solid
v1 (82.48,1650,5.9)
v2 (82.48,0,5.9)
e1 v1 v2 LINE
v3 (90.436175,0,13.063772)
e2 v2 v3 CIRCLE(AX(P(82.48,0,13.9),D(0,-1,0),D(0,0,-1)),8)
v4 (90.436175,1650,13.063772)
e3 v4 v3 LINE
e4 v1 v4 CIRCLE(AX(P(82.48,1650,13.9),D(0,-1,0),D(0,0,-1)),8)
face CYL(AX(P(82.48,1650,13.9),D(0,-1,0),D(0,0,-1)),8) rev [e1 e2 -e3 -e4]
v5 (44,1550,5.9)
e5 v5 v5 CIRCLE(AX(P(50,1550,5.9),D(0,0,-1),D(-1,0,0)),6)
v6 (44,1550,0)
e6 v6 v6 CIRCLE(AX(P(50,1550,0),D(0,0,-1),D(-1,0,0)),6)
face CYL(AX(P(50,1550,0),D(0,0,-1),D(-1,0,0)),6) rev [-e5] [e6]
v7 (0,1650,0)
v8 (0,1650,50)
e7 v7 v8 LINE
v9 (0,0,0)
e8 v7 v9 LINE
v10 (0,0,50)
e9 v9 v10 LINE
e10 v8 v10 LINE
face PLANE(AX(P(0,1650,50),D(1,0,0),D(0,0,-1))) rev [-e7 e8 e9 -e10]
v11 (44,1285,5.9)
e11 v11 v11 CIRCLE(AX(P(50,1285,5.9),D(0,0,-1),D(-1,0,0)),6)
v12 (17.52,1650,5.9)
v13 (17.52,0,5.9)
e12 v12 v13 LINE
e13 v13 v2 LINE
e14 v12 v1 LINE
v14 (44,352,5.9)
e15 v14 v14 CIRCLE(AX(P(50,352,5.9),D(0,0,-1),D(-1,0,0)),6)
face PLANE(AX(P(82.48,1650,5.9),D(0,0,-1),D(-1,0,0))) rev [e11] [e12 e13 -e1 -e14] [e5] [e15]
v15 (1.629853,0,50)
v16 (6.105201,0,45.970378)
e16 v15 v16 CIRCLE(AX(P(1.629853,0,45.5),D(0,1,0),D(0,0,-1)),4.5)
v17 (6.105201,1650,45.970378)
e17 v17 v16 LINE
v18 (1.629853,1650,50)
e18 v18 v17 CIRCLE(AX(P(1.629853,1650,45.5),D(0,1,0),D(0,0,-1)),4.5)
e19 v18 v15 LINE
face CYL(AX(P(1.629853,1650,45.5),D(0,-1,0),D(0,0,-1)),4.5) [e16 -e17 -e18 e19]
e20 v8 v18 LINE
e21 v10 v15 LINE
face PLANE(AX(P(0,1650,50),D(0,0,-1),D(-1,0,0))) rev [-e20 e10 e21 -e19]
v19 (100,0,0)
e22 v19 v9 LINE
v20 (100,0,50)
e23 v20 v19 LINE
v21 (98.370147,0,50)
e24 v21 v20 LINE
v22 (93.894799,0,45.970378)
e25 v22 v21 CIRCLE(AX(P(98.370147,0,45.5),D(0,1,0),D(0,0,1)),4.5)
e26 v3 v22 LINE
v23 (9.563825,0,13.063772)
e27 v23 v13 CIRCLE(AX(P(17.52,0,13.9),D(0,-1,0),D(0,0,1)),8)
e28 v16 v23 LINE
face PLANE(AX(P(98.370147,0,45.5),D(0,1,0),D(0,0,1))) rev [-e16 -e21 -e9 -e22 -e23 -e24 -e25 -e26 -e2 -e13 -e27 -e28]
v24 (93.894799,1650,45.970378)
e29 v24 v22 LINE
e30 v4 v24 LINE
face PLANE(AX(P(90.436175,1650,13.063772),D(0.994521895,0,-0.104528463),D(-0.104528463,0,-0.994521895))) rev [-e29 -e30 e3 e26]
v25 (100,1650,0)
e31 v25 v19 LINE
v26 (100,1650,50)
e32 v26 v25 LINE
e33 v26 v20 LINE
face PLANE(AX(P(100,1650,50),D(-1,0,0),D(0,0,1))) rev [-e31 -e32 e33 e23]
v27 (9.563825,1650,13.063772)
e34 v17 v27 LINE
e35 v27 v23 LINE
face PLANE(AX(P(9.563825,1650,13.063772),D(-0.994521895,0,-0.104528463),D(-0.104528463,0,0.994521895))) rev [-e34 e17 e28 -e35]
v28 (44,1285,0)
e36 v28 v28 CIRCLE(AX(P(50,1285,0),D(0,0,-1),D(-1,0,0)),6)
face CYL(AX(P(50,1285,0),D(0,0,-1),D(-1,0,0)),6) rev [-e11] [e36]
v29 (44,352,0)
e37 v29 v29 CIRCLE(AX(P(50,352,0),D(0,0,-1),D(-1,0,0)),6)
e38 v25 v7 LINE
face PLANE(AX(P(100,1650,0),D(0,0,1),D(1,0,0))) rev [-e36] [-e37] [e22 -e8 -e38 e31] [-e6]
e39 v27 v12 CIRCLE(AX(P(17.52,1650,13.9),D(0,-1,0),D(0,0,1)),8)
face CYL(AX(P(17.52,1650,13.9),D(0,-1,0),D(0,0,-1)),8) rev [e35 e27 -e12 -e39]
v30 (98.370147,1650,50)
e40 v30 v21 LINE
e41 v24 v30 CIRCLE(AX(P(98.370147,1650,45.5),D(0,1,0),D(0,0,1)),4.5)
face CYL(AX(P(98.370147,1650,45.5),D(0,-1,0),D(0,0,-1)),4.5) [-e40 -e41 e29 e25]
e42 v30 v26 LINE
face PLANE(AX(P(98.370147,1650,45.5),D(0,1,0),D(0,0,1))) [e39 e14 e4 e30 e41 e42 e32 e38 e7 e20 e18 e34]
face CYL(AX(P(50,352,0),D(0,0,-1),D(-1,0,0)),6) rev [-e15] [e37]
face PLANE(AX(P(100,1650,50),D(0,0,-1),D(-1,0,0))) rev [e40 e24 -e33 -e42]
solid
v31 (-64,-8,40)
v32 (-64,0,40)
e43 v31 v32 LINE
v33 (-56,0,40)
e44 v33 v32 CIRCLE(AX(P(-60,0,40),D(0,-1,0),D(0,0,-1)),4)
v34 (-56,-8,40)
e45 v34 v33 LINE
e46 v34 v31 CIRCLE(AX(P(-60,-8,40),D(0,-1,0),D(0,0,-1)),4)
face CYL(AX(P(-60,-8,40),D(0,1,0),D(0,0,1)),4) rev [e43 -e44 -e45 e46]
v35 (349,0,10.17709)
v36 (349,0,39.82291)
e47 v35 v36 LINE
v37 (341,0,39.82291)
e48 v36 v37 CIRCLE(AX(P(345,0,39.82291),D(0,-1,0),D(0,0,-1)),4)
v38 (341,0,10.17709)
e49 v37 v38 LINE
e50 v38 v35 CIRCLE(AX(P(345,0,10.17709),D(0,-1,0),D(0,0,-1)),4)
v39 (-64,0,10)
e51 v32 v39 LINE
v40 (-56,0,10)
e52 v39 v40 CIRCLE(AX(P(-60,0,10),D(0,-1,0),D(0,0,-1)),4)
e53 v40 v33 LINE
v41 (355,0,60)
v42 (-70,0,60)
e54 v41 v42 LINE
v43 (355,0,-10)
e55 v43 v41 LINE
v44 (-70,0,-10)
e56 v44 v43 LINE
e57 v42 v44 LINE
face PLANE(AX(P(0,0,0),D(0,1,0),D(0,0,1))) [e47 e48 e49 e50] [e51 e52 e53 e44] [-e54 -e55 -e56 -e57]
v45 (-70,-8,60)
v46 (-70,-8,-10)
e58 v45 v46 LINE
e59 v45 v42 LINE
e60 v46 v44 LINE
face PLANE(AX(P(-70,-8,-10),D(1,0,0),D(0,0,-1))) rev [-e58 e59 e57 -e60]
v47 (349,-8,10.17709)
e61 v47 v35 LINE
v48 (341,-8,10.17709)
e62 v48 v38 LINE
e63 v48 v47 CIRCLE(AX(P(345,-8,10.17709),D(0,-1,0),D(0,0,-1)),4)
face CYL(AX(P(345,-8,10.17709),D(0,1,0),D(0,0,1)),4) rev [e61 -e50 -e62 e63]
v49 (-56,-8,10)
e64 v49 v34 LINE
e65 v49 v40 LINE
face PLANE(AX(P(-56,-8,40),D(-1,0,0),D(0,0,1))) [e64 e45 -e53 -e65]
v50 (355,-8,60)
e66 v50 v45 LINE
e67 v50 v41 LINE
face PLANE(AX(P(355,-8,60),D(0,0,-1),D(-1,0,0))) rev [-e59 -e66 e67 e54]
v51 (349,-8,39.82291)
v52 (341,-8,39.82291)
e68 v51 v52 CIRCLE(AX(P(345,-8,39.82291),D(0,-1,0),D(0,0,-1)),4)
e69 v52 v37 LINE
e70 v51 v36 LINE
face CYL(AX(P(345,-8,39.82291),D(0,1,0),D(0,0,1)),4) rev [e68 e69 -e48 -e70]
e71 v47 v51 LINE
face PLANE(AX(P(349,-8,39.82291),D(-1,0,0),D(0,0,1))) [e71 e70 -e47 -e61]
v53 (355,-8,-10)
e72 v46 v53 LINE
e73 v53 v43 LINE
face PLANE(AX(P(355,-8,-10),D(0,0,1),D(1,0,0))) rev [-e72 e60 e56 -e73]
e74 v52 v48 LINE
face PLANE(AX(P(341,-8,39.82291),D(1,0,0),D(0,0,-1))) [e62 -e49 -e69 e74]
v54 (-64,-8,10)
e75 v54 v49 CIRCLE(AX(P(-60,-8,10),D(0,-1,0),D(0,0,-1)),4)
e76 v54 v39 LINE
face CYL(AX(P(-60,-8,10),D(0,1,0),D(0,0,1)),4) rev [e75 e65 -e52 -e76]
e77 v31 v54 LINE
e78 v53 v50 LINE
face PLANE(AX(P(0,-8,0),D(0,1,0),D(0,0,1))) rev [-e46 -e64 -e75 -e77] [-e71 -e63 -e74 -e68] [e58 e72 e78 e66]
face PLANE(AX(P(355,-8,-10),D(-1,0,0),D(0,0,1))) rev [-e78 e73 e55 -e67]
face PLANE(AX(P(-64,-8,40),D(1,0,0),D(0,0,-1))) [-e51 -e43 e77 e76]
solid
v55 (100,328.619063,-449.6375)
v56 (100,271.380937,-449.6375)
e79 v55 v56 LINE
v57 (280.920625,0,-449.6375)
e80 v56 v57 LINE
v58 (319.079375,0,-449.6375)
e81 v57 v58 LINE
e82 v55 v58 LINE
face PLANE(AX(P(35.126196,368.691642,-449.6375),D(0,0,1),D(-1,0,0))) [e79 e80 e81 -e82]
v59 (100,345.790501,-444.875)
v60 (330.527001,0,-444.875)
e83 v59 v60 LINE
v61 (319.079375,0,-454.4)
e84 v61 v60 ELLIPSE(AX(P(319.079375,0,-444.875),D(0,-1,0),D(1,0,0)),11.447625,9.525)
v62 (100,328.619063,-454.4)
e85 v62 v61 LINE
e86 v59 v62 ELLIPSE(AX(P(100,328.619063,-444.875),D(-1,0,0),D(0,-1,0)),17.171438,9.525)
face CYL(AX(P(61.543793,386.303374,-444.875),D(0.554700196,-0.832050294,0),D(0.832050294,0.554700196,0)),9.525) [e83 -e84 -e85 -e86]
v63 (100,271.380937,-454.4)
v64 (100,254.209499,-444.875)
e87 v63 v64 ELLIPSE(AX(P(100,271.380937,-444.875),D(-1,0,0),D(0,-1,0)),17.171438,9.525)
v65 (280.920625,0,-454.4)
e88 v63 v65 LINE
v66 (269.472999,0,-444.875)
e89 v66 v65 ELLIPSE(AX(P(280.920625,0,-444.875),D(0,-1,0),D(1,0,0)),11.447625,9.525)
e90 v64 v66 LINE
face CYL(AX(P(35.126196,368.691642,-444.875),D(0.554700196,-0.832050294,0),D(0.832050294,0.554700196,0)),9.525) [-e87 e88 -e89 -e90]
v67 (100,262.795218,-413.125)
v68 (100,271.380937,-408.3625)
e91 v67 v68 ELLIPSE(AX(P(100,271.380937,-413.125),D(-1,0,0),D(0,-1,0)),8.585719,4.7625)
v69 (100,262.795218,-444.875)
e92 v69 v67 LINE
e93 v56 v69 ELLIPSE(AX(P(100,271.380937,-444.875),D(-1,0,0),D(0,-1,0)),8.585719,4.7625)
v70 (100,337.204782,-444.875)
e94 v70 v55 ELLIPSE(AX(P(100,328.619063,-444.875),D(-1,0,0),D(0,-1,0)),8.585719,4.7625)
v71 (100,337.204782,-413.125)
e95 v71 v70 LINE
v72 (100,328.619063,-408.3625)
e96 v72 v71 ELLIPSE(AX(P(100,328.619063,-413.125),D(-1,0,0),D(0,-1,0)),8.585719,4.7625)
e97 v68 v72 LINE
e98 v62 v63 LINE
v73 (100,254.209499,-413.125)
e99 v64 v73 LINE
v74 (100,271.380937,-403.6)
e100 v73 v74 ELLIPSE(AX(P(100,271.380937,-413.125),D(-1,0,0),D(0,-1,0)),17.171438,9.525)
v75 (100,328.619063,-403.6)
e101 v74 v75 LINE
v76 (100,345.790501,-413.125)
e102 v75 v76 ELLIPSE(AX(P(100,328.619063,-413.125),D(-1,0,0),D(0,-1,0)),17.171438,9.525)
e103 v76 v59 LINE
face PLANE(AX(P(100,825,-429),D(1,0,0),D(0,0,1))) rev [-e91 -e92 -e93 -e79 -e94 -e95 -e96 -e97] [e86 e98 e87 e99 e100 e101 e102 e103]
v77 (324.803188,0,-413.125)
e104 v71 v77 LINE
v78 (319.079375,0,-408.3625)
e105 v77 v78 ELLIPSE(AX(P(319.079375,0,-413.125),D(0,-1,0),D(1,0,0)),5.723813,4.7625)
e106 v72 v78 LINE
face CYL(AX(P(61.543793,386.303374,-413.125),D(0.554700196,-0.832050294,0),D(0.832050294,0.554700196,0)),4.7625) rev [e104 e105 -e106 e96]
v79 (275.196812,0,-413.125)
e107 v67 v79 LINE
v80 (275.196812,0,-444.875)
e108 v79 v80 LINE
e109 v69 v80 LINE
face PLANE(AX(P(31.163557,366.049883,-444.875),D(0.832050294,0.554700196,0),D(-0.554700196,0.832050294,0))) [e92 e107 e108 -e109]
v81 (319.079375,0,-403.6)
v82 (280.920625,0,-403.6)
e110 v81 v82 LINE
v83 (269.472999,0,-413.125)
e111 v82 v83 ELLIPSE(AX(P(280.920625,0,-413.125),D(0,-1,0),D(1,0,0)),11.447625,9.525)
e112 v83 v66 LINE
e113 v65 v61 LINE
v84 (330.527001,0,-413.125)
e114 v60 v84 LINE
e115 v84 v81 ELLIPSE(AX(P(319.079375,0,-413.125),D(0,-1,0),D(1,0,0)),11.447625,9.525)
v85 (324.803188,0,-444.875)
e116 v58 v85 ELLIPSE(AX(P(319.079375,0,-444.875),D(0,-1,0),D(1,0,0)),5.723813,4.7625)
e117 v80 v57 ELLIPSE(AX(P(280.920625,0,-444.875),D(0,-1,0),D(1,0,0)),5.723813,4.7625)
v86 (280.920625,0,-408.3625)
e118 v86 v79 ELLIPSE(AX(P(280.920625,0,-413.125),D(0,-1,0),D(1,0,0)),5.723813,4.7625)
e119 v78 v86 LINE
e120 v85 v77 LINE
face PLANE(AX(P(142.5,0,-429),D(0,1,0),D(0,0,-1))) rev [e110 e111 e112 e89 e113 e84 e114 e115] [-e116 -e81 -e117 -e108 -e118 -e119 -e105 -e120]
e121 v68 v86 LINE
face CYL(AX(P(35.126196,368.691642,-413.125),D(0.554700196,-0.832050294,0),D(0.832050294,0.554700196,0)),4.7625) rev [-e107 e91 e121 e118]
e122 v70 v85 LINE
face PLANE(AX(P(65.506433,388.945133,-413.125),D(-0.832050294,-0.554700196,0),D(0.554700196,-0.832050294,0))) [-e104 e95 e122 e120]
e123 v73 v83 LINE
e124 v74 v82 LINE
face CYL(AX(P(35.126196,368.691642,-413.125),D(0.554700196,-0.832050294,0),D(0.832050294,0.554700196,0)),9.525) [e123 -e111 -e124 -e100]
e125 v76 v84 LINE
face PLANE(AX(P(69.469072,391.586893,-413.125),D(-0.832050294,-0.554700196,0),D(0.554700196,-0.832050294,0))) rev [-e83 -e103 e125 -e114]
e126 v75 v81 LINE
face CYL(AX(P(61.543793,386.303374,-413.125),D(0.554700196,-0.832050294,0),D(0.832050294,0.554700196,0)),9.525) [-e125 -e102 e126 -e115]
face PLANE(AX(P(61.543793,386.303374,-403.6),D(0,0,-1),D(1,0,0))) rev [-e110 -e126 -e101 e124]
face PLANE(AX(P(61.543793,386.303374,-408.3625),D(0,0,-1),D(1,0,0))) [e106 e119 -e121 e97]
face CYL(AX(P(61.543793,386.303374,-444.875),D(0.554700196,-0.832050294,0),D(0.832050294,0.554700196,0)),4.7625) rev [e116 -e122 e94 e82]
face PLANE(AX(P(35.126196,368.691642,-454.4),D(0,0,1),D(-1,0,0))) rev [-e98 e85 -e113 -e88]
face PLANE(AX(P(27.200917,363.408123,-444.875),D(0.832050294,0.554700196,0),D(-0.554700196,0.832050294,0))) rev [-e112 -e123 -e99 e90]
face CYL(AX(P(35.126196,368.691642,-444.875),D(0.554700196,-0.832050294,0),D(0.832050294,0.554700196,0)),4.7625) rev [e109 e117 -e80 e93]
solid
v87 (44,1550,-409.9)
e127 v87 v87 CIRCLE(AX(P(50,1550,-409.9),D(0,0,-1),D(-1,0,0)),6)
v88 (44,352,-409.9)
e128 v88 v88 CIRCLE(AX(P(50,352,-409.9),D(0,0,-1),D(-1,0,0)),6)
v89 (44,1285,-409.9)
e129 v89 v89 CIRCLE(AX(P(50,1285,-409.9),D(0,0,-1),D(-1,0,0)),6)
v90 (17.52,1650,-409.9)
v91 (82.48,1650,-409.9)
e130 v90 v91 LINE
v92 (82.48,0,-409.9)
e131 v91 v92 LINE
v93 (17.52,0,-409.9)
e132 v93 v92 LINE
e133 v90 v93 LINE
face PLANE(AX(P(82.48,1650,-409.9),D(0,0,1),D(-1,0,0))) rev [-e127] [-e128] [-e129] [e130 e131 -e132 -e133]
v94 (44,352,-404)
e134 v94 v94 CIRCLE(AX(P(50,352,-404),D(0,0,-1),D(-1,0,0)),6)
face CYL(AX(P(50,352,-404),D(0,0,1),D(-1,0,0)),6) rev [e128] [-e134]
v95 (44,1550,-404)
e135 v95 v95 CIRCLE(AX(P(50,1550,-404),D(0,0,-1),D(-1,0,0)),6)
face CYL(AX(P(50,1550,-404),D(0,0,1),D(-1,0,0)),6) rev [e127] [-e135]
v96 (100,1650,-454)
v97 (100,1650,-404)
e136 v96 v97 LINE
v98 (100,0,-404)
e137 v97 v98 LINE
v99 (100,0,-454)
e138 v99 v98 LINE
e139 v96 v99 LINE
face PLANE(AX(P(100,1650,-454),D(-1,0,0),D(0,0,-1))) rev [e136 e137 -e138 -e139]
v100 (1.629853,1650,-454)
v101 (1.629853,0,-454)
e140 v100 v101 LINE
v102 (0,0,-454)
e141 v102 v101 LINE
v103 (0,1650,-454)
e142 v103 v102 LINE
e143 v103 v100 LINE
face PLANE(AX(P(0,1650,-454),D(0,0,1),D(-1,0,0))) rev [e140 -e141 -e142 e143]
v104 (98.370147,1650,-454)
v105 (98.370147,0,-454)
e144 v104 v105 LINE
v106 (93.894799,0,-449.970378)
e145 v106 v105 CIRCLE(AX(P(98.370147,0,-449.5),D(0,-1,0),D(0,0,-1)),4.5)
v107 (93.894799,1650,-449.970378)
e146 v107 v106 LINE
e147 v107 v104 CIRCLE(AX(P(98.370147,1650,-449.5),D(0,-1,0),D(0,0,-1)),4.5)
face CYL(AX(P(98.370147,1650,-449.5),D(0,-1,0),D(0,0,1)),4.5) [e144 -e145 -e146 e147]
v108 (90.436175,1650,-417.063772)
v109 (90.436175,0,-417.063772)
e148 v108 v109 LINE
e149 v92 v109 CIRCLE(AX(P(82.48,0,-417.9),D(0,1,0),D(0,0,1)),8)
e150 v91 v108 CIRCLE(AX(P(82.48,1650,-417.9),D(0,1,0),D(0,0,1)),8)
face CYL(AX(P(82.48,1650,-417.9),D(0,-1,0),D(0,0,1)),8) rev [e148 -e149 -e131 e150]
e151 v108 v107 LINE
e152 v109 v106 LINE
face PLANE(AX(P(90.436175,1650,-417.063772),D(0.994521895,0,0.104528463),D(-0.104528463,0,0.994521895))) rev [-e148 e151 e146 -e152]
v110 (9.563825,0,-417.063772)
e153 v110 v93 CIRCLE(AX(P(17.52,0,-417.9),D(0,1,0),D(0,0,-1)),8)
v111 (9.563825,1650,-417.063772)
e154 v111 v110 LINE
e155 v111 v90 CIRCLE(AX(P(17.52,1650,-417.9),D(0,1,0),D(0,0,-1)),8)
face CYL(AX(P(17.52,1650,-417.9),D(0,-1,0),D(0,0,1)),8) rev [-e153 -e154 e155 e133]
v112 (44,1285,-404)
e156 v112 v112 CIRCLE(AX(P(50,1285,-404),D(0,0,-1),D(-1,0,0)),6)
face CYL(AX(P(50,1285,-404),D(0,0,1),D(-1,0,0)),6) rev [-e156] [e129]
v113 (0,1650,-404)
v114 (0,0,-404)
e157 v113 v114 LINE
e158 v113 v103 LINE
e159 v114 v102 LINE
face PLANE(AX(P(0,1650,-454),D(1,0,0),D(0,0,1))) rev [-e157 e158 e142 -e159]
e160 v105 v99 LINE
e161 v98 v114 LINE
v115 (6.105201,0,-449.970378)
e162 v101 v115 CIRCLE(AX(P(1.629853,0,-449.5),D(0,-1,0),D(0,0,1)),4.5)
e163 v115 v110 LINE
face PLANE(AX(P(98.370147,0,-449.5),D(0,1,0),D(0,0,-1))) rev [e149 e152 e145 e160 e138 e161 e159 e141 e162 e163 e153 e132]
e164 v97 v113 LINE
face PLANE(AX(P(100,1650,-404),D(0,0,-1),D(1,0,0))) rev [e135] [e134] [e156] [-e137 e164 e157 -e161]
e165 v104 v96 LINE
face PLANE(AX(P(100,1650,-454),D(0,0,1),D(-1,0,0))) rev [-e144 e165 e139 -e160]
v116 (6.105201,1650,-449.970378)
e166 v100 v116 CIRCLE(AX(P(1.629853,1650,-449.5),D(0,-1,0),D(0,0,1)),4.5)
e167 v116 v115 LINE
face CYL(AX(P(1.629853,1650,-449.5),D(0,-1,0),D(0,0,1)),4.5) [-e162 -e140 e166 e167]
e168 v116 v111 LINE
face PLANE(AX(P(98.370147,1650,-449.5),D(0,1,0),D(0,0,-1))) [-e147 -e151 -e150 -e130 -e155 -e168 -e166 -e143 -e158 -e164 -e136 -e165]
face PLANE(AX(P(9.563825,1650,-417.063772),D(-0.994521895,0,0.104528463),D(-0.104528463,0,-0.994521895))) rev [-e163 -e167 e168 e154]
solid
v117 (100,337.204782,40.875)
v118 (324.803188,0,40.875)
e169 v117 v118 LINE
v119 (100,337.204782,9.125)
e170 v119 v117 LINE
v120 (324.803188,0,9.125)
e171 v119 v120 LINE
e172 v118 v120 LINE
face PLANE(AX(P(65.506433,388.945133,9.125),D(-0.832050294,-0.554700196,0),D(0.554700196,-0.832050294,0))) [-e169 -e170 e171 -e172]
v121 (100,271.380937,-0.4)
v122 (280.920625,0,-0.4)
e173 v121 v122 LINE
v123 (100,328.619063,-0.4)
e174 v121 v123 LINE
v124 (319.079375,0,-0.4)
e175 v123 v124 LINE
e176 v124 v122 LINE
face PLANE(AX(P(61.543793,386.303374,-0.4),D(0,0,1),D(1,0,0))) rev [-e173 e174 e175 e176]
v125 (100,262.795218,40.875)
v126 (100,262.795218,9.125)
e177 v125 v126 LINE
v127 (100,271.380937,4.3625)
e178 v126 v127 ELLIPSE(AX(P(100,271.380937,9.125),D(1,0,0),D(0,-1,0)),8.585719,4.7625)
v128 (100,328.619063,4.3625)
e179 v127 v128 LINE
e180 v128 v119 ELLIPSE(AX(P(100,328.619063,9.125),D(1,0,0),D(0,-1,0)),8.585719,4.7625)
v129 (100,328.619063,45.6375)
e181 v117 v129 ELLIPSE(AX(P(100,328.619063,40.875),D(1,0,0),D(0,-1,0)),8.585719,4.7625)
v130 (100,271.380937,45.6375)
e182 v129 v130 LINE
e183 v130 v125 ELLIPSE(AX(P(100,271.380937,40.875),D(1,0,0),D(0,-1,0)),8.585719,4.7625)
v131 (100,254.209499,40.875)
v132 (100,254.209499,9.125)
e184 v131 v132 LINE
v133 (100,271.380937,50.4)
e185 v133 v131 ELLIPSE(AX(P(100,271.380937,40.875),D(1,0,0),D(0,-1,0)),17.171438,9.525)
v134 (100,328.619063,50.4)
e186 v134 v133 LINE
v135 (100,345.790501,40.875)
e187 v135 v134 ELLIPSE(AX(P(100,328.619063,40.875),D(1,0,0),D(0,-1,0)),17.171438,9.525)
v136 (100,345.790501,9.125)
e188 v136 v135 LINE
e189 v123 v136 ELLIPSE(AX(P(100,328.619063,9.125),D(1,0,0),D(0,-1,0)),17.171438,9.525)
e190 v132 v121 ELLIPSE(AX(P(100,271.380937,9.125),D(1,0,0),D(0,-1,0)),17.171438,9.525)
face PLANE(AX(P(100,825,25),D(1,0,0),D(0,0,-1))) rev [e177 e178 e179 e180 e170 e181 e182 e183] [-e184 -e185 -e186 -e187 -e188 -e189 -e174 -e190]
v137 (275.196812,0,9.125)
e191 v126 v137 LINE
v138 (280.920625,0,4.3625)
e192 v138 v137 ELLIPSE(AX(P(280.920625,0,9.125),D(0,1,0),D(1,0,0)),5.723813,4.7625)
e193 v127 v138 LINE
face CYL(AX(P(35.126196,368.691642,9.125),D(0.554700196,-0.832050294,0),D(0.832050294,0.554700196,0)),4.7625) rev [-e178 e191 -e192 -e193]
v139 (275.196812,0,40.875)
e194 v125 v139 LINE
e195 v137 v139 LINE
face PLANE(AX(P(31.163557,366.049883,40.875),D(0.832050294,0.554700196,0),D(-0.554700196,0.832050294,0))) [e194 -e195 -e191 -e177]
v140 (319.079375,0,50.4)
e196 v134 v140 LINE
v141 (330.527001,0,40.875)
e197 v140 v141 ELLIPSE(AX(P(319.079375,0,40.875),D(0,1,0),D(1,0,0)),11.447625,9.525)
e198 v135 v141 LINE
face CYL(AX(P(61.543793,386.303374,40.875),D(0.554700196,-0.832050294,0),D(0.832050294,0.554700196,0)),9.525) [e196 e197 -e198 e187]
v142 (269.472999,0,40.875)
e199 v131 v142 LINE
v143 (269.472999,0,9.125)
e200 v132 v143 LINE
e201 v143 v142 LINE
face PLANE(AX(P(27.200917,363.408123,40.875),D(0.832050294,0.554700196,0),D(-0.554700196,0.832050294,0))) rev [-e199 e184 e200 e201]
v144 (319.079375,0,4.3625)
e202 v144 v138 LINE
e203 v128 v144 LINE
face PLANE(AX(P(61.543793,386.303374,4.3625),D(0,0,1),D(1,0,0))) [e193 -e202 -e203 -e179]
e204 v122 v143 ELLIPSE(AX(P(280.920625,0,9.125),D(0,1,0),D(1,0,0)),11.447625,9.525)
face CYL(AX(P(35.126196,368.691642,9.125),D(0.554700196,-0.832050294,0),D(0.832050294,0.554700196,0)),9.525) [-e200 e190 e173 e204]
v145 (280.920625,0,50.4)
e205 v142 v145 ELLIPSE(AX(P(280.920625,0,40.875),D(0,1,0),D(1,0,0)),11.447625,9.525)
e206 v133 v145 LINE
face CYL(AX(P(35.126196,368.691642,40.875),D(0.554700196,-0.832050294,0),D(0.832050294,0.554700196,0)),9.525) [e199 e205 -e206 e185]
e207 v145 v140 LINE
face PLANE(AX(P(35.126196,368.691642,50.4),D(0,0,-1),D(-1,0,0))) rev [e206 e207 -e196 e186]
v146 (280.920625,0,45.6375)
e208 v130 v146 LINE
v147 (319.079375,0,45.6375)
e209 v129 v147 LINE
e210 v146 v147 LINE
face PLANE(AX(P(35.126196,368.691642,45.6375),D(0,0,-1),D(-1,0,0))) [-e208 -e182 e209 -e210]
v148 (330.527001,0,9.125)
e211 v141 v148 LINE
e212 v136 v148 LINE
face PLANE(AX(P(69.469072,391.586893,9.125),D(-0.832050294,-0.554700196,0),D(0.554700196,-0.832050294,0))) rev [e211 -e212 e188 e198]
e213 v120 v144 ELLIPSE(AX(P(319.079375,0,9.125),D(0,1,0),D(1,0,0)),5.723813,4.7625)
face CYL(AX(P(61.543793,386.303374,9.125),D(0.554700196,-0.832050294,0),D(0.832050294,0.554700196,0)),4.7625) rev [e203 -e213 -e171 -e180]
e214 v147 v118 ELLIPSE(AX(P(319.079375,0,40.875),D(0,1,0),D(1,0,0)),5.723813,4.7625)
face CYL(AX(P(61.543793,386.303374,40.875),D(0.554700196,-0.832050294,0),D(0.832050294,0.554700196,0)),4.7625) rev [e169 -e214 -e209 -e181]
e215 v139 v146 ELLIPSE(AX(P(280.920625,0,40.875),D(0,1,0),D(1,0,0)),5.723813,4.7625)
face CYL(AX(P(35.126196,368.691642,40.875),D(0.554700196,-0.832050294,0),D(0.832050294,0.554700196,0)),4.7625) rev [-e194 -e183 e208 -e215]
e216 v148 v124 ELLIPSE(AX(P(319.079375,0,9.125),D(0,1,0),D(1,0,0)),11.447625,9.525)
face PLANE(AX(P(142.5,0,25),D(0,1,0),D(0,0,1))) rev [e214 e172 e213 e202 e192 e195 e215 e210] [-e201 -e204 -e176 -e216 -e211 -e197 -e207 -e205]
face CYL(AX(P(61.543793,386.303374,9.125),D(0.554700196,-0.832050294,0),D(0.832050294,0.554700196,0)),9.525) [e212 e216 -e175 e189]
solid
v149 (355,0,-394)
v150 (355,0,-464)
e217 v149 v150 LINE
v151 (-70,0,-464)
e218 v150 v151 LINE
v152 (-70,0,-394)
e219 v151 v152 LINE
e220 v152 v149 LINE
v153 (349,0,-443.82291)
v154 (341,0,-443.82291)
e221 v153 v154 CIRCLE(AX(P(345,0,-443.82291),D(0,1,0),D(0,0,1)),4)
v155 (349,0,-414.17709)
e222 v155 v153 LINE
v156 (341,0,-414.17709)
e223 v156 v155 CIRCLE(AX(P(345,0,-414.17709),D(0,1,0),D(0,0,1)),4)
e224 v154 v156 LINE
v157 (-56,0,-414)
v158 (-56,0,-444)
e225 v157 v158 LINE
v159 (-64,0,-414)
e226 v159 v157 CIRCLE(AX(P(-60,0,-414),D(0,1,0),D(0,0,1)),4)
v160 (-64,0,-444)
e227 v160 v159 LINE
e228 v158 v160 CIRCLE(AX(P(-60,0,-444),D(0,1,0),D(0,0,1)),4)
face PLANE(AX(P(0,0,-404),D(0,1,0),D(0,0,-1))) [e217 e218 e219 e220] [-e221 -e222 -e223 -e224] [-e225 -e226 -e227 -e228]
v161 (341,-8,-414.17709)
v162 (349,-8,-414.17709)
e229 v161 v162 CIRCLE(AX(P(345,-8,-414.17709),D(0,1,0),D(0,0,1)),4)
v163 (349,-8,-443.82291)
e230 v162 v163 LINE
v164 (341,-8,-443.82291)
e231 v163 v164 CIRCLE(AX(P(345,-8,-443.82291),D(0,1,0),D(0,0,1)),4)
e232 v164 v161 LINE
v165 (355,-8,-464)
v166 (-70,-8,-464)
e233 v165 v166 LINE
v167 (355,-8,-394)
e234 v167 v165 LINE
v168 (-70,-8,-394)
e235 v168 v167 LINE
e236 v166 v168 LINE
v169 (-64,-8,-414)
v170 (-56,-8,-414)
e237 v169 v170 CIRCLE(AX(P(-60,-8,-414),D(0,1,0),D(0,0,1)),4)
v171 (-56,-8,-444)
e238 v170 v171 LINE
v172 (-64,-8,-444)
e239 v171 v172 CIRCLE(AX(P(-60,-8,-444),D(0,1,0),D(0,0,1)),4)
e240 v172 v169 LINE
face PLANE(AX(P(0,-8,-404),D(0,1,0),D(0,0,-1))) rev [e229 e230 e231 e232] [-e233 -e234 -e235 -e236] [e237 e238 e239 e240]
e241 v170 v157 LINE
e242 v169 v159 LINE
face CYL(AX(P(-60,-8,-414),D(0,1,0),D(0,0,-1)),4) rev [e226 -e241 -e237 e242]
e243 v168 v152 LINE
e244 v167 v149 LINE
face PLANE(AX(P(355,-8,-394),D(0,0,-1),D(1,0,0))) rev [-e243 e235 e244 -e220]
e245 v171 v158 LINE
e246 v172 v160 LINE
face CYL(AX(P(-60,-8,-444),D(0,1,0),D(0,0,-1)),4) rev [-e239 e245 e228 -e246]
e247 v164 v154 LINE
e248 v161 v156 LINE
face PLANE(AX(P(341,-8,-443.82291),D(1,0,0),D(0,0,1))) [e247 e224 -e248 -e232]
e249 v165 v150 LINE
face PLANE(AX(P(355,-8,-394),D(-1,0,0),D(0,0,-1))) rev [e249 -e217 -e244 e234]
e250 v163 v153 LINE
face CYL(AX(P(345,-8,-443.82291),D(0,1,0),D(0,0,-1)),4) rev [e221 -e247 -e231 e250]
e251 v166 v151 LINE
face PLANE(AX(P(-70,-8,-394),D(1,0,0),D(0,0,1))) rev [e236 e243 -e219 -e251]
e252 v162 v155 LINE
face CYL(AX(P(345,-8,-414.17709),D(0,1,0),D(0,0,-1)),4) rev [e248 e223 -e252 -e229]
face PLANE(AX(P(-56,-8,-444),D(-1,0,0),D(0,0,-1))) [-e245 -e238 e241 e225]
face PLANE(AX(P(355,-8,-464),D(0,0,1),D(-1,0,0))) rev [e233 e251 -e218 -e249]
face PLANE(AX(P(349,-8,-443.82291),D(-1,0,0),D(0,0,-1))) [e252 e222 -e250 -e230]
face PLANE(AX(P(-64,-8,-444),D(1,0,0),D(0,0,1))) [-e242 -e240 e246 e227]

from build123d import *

# Parameters (mm, degrees)
CEOWNIK_C_100_X_10_1_DEPTH                     = 1650
SZKIC21_W                                      = 425
SZKIC21_H                                      = 70
DODANIE_WYCI_GNI_CIE1_DEPTH                    = 8
RURA_CIENKO_CIENNA_KWADRATOWA_TS2X2X0_18_DEPTH = 524.856349859
SZKIC59_W                                      = 6
SZKIC59_H                                      = 60
OTWORY_USTALAJ_CE_12_0MM1_AT_2_COUNT           = 2
OTWORY_USTALAJ_CE_12_0MM1_AT_2_PITCH           = 265
OTWORY_USTALAJ_CE_12_0MM1_AT_3_COUNT           = 2
OTWORY_USTALAJ_CE_12_0MM1_AT_3_PITCH           = 1198


# Read off the part's stored shape, not the designer's step: Przytnij/Wydłuż2, Przytnij/Wydłuż3
with BuildPart() as part:
    # Sketch118 → Ceownik c 100 X 10(1) (new body)
    with BuildSketch(Plane.ZX):
        with BuildLine():
            Line((50, 100), (0, 100))
            Line((0, 100), (0, 0))
            Line((0, 0), (50, 0))
            Line((50, 0), (50, 1.629852671))
            ThreePointArc((50, 1.629852671), (48.844151715, 4.6409404), (45.970378085, 6.1052012))
            Line((45.970378085, 6.1052012), (13.063772294, 9.563824837))
            ThreePointArc((13.063772294, 9.563824837), (7.954841396, 12.166955149), (5.9, 17.52))
            Line((5.9, 17.52), (5.9, 82.48))
            ThreePointArc((5.9, 82.48), (7.954841396, 87.833044851), (13.063772294, 90.436175163))
            Line((13.063772294, 90.436175163), (45.970378085, 93.8947988))
            ThreePointArc((45.970378085, 93.8947988), (48.844151715, 95.3590596), (50, 98.370147329))
            Line((50, 98.370147329), (50, 100))
        make_face()
    extrude(amount=CEOWNIK_C_100_X_10_1_DEPTH)

    # Szkic59 → Otwory ustalające Ø12.0mm1 (revolve, cut)
    with BuildSketch(Plane(origin=(50, 1550, 0), x_dir=(0, 1, 0), z_dir=(1, 0, 0))):
        with Locations((3, 30)):
            Rectangle(SZKIC59_W, SZKIC59_H)
    otwory_ustalaj_ce_12_0mm1 = revolve(axis=Axis((50, 1550, -6.35), (0, 0, 1)), mode=Mode.SUBTRACT)

    # Otwory ustalające Ø12.0mm1 at 2: Otwory ustalające Ø12.0mm1 ×2
    with Locations(*[(0, -i * OTWORY_USTALAJ_CE_12_0MM1_AT_2_PITCH, 0) for i in range(1, OTWORY_USTALAJ_CE_12_0MM1_AT_2_COUNT)]):
        add(otwory_ustalaj_ce_12_0mm1, mode=Mode.SUBTRACT)

    # Otwory ustalające Ø12.0mm1 at 3: Otwory ustalające Ø12.0mm1 ×2
    with Locations(*[(0, -i * OTWORY_USTALAJ_CE_12_0MM1_AT_3_PITCH, 0) for i in range(1, OTWORY_USTALAJ_CE_12_0MM1_AT_3_COUNT)]):
        add(otwory_ustalaj_ce_12_0mm1, mode=Mode.SUBTRACT)


with BuildPart() as body_2:
    # Szkic21 → Dodanie-wyciągnięcie1 (new body)
    with BuildSketch(Plane.XZ):
        with Locations((142.5, 25)):
            Rectangle(SZKIC21_W, SZKIC21_H)
        with BuildLine():
            Line((-56, 40), (-56, 10))
            ThreePointArc((-56, 10), (-60, 6), (-64, 10))
            Line((-64, 10), (-64, 40))
            ThreePointArc((-64, 40), (-60, 44), (-56, 40))
        make_face(mode=Mode.SUBTRACT)
        with BuildLine():
            Line((349, 39.822910334), (349, 10.177089666))
            ThreePointArc((349, 10.177089666), (345, 6.177089666), (341, 10.177089666))
            Line((341, 10.177089666), (341, 39.822910334))
            ThreePointArc((341, 39.822910334), (345, 43.822910334), (349, 39.822910334))
        make_face(mode=Mode.SUBTRACT)
    extrude(amount=DODANIE_WYCI_GNI_CIE1_DEPTH)


with BuildPart() as body_3:
    # Sketch1 → Rura cienkościenna kwadratowa TS2X2X0.1875(1) (new body)
    with BuildSketch(Plane(origin=(339.472914964, -59.209372446, 25), x_dir=(0.8320502943378437, 0.5547001962252293, 0), z_dir=(-0.5547001962252293, 0.8320502943378437, 0))):
        with BuildLine():
            Line((-15.875, -25.4), (15.875, -25.4))
            ThreePointArc((15.875, -25.4), (22.610192091, -22.610192091), (25.4, -15.875))
            Line((25.4, -15.875), (25.4, 15.875))
            ThreePointArc((25.4, 15.875), (22.610192091, 22.610192091), (15.875, 25.4))
            Line((15.875, 25.4), (-15.875, 25.4))
            ThreePointArc((-15.875, 25.4), (-22.610192091, 22.610192091), (-25.4, 15.875))
            Line((-25.4, 15.875), (-25.4, -15.875))
            ThreePointArc((-25.4, -15.875), (-22.610192091, -22.610192091), (-15.875, -25.4))
        make_face()
        with BuildLine():
            Line((-15.875, -20.6375), (15.875, -20.6375))
            ThreePointArc((15.875, -20.6375), (19.242596045, -19.242596045), (20.6375, -15.875))
            Line((20.6375, -15.875), (20.6375, 15.875))
            ThreePointArc((20.6375, 15.875), (19.242596045, 19.242596045), (15.875, 20.6375))
            Line((15.875, 20.6375), (-15.875, 20.6375))
            ThreePointArc((-15.875, 20.6375), (-19.242596045, 19.242596045), (-20.6375, 15.875))
            Line((-20.6375, 15.875), (-20.6375, -15.875))
            ThreePointArc((-20.6375, -15.875), (-19.242596045, -19.242596045), (-15.875, -20.6375))
        make_face(mode=Mode.SUBTRACT)
    extrude(amount=RURA_CIENKO_CIENNA_KWADRATOWA_TS2X2X0_18_DEPTH)


with BuildPart() as body_4:
    # Przytnij/Wydłuż2: the piece on the far side of the plane
    add(body_3.part)
    split(bisect_by=Plane(origin=(0, 0, 0), x_dir=(1, 0, 0), z_dir=(0, 1, 0)), keep=Keep.BOTTOM)


with BuildPart() as body_3_1:
    add(body_3.part)

    # Przytnij/Wydłuż2
    split(bisect_by=Plane(origin=(0, 0, 0), x_dir=(1, 0, 0), z_dir=(0, 1, 0)), keep=Keep.TOP)


with BuildPart() as body_4_2:
    # Przytnij/Wydłuż3: the piece on the far side of the plane
    add(body_3_1.part)
    split(bisect_by=Plane.YZ.offset(100), keep=Keep.BOTTOM)


with BuildPart() as body_3_2:
    add(body_3_1.part)

    # Przytnij/Wydłuż3
    split(bisect_by=Plane.YZ.offset(100), keep=Keep.TOP)


with BuildPart() as body_4_3:
    # Lustro3: mirrored copy
    add(part.part.mirror(Plane(origin=(0, 0, -202), x_dir=(1, 0, 0), z_dir=(0, 0, -1))))


with BuildPart() as body_5:
    # Lustro3 2: mirrored copy
    add(body_3_2.part.mirror(Plane(origin=(0, 0, -202), x_dir=(1, 0, 0), z_dir=(0, 0, -1))))


with BuildPart() as body_6:
    # Lustro3 3: mirrored copy
    add(body_2.part.mirror(Plane(origin=(0, 0, -202), x_dir=(1, 0, 0), z_dir=(0, 0, -1))))


solid = Compound([part.part, body_2.part, body_3_2.part, body_4_3.part, body_5.part, body_6.part])
